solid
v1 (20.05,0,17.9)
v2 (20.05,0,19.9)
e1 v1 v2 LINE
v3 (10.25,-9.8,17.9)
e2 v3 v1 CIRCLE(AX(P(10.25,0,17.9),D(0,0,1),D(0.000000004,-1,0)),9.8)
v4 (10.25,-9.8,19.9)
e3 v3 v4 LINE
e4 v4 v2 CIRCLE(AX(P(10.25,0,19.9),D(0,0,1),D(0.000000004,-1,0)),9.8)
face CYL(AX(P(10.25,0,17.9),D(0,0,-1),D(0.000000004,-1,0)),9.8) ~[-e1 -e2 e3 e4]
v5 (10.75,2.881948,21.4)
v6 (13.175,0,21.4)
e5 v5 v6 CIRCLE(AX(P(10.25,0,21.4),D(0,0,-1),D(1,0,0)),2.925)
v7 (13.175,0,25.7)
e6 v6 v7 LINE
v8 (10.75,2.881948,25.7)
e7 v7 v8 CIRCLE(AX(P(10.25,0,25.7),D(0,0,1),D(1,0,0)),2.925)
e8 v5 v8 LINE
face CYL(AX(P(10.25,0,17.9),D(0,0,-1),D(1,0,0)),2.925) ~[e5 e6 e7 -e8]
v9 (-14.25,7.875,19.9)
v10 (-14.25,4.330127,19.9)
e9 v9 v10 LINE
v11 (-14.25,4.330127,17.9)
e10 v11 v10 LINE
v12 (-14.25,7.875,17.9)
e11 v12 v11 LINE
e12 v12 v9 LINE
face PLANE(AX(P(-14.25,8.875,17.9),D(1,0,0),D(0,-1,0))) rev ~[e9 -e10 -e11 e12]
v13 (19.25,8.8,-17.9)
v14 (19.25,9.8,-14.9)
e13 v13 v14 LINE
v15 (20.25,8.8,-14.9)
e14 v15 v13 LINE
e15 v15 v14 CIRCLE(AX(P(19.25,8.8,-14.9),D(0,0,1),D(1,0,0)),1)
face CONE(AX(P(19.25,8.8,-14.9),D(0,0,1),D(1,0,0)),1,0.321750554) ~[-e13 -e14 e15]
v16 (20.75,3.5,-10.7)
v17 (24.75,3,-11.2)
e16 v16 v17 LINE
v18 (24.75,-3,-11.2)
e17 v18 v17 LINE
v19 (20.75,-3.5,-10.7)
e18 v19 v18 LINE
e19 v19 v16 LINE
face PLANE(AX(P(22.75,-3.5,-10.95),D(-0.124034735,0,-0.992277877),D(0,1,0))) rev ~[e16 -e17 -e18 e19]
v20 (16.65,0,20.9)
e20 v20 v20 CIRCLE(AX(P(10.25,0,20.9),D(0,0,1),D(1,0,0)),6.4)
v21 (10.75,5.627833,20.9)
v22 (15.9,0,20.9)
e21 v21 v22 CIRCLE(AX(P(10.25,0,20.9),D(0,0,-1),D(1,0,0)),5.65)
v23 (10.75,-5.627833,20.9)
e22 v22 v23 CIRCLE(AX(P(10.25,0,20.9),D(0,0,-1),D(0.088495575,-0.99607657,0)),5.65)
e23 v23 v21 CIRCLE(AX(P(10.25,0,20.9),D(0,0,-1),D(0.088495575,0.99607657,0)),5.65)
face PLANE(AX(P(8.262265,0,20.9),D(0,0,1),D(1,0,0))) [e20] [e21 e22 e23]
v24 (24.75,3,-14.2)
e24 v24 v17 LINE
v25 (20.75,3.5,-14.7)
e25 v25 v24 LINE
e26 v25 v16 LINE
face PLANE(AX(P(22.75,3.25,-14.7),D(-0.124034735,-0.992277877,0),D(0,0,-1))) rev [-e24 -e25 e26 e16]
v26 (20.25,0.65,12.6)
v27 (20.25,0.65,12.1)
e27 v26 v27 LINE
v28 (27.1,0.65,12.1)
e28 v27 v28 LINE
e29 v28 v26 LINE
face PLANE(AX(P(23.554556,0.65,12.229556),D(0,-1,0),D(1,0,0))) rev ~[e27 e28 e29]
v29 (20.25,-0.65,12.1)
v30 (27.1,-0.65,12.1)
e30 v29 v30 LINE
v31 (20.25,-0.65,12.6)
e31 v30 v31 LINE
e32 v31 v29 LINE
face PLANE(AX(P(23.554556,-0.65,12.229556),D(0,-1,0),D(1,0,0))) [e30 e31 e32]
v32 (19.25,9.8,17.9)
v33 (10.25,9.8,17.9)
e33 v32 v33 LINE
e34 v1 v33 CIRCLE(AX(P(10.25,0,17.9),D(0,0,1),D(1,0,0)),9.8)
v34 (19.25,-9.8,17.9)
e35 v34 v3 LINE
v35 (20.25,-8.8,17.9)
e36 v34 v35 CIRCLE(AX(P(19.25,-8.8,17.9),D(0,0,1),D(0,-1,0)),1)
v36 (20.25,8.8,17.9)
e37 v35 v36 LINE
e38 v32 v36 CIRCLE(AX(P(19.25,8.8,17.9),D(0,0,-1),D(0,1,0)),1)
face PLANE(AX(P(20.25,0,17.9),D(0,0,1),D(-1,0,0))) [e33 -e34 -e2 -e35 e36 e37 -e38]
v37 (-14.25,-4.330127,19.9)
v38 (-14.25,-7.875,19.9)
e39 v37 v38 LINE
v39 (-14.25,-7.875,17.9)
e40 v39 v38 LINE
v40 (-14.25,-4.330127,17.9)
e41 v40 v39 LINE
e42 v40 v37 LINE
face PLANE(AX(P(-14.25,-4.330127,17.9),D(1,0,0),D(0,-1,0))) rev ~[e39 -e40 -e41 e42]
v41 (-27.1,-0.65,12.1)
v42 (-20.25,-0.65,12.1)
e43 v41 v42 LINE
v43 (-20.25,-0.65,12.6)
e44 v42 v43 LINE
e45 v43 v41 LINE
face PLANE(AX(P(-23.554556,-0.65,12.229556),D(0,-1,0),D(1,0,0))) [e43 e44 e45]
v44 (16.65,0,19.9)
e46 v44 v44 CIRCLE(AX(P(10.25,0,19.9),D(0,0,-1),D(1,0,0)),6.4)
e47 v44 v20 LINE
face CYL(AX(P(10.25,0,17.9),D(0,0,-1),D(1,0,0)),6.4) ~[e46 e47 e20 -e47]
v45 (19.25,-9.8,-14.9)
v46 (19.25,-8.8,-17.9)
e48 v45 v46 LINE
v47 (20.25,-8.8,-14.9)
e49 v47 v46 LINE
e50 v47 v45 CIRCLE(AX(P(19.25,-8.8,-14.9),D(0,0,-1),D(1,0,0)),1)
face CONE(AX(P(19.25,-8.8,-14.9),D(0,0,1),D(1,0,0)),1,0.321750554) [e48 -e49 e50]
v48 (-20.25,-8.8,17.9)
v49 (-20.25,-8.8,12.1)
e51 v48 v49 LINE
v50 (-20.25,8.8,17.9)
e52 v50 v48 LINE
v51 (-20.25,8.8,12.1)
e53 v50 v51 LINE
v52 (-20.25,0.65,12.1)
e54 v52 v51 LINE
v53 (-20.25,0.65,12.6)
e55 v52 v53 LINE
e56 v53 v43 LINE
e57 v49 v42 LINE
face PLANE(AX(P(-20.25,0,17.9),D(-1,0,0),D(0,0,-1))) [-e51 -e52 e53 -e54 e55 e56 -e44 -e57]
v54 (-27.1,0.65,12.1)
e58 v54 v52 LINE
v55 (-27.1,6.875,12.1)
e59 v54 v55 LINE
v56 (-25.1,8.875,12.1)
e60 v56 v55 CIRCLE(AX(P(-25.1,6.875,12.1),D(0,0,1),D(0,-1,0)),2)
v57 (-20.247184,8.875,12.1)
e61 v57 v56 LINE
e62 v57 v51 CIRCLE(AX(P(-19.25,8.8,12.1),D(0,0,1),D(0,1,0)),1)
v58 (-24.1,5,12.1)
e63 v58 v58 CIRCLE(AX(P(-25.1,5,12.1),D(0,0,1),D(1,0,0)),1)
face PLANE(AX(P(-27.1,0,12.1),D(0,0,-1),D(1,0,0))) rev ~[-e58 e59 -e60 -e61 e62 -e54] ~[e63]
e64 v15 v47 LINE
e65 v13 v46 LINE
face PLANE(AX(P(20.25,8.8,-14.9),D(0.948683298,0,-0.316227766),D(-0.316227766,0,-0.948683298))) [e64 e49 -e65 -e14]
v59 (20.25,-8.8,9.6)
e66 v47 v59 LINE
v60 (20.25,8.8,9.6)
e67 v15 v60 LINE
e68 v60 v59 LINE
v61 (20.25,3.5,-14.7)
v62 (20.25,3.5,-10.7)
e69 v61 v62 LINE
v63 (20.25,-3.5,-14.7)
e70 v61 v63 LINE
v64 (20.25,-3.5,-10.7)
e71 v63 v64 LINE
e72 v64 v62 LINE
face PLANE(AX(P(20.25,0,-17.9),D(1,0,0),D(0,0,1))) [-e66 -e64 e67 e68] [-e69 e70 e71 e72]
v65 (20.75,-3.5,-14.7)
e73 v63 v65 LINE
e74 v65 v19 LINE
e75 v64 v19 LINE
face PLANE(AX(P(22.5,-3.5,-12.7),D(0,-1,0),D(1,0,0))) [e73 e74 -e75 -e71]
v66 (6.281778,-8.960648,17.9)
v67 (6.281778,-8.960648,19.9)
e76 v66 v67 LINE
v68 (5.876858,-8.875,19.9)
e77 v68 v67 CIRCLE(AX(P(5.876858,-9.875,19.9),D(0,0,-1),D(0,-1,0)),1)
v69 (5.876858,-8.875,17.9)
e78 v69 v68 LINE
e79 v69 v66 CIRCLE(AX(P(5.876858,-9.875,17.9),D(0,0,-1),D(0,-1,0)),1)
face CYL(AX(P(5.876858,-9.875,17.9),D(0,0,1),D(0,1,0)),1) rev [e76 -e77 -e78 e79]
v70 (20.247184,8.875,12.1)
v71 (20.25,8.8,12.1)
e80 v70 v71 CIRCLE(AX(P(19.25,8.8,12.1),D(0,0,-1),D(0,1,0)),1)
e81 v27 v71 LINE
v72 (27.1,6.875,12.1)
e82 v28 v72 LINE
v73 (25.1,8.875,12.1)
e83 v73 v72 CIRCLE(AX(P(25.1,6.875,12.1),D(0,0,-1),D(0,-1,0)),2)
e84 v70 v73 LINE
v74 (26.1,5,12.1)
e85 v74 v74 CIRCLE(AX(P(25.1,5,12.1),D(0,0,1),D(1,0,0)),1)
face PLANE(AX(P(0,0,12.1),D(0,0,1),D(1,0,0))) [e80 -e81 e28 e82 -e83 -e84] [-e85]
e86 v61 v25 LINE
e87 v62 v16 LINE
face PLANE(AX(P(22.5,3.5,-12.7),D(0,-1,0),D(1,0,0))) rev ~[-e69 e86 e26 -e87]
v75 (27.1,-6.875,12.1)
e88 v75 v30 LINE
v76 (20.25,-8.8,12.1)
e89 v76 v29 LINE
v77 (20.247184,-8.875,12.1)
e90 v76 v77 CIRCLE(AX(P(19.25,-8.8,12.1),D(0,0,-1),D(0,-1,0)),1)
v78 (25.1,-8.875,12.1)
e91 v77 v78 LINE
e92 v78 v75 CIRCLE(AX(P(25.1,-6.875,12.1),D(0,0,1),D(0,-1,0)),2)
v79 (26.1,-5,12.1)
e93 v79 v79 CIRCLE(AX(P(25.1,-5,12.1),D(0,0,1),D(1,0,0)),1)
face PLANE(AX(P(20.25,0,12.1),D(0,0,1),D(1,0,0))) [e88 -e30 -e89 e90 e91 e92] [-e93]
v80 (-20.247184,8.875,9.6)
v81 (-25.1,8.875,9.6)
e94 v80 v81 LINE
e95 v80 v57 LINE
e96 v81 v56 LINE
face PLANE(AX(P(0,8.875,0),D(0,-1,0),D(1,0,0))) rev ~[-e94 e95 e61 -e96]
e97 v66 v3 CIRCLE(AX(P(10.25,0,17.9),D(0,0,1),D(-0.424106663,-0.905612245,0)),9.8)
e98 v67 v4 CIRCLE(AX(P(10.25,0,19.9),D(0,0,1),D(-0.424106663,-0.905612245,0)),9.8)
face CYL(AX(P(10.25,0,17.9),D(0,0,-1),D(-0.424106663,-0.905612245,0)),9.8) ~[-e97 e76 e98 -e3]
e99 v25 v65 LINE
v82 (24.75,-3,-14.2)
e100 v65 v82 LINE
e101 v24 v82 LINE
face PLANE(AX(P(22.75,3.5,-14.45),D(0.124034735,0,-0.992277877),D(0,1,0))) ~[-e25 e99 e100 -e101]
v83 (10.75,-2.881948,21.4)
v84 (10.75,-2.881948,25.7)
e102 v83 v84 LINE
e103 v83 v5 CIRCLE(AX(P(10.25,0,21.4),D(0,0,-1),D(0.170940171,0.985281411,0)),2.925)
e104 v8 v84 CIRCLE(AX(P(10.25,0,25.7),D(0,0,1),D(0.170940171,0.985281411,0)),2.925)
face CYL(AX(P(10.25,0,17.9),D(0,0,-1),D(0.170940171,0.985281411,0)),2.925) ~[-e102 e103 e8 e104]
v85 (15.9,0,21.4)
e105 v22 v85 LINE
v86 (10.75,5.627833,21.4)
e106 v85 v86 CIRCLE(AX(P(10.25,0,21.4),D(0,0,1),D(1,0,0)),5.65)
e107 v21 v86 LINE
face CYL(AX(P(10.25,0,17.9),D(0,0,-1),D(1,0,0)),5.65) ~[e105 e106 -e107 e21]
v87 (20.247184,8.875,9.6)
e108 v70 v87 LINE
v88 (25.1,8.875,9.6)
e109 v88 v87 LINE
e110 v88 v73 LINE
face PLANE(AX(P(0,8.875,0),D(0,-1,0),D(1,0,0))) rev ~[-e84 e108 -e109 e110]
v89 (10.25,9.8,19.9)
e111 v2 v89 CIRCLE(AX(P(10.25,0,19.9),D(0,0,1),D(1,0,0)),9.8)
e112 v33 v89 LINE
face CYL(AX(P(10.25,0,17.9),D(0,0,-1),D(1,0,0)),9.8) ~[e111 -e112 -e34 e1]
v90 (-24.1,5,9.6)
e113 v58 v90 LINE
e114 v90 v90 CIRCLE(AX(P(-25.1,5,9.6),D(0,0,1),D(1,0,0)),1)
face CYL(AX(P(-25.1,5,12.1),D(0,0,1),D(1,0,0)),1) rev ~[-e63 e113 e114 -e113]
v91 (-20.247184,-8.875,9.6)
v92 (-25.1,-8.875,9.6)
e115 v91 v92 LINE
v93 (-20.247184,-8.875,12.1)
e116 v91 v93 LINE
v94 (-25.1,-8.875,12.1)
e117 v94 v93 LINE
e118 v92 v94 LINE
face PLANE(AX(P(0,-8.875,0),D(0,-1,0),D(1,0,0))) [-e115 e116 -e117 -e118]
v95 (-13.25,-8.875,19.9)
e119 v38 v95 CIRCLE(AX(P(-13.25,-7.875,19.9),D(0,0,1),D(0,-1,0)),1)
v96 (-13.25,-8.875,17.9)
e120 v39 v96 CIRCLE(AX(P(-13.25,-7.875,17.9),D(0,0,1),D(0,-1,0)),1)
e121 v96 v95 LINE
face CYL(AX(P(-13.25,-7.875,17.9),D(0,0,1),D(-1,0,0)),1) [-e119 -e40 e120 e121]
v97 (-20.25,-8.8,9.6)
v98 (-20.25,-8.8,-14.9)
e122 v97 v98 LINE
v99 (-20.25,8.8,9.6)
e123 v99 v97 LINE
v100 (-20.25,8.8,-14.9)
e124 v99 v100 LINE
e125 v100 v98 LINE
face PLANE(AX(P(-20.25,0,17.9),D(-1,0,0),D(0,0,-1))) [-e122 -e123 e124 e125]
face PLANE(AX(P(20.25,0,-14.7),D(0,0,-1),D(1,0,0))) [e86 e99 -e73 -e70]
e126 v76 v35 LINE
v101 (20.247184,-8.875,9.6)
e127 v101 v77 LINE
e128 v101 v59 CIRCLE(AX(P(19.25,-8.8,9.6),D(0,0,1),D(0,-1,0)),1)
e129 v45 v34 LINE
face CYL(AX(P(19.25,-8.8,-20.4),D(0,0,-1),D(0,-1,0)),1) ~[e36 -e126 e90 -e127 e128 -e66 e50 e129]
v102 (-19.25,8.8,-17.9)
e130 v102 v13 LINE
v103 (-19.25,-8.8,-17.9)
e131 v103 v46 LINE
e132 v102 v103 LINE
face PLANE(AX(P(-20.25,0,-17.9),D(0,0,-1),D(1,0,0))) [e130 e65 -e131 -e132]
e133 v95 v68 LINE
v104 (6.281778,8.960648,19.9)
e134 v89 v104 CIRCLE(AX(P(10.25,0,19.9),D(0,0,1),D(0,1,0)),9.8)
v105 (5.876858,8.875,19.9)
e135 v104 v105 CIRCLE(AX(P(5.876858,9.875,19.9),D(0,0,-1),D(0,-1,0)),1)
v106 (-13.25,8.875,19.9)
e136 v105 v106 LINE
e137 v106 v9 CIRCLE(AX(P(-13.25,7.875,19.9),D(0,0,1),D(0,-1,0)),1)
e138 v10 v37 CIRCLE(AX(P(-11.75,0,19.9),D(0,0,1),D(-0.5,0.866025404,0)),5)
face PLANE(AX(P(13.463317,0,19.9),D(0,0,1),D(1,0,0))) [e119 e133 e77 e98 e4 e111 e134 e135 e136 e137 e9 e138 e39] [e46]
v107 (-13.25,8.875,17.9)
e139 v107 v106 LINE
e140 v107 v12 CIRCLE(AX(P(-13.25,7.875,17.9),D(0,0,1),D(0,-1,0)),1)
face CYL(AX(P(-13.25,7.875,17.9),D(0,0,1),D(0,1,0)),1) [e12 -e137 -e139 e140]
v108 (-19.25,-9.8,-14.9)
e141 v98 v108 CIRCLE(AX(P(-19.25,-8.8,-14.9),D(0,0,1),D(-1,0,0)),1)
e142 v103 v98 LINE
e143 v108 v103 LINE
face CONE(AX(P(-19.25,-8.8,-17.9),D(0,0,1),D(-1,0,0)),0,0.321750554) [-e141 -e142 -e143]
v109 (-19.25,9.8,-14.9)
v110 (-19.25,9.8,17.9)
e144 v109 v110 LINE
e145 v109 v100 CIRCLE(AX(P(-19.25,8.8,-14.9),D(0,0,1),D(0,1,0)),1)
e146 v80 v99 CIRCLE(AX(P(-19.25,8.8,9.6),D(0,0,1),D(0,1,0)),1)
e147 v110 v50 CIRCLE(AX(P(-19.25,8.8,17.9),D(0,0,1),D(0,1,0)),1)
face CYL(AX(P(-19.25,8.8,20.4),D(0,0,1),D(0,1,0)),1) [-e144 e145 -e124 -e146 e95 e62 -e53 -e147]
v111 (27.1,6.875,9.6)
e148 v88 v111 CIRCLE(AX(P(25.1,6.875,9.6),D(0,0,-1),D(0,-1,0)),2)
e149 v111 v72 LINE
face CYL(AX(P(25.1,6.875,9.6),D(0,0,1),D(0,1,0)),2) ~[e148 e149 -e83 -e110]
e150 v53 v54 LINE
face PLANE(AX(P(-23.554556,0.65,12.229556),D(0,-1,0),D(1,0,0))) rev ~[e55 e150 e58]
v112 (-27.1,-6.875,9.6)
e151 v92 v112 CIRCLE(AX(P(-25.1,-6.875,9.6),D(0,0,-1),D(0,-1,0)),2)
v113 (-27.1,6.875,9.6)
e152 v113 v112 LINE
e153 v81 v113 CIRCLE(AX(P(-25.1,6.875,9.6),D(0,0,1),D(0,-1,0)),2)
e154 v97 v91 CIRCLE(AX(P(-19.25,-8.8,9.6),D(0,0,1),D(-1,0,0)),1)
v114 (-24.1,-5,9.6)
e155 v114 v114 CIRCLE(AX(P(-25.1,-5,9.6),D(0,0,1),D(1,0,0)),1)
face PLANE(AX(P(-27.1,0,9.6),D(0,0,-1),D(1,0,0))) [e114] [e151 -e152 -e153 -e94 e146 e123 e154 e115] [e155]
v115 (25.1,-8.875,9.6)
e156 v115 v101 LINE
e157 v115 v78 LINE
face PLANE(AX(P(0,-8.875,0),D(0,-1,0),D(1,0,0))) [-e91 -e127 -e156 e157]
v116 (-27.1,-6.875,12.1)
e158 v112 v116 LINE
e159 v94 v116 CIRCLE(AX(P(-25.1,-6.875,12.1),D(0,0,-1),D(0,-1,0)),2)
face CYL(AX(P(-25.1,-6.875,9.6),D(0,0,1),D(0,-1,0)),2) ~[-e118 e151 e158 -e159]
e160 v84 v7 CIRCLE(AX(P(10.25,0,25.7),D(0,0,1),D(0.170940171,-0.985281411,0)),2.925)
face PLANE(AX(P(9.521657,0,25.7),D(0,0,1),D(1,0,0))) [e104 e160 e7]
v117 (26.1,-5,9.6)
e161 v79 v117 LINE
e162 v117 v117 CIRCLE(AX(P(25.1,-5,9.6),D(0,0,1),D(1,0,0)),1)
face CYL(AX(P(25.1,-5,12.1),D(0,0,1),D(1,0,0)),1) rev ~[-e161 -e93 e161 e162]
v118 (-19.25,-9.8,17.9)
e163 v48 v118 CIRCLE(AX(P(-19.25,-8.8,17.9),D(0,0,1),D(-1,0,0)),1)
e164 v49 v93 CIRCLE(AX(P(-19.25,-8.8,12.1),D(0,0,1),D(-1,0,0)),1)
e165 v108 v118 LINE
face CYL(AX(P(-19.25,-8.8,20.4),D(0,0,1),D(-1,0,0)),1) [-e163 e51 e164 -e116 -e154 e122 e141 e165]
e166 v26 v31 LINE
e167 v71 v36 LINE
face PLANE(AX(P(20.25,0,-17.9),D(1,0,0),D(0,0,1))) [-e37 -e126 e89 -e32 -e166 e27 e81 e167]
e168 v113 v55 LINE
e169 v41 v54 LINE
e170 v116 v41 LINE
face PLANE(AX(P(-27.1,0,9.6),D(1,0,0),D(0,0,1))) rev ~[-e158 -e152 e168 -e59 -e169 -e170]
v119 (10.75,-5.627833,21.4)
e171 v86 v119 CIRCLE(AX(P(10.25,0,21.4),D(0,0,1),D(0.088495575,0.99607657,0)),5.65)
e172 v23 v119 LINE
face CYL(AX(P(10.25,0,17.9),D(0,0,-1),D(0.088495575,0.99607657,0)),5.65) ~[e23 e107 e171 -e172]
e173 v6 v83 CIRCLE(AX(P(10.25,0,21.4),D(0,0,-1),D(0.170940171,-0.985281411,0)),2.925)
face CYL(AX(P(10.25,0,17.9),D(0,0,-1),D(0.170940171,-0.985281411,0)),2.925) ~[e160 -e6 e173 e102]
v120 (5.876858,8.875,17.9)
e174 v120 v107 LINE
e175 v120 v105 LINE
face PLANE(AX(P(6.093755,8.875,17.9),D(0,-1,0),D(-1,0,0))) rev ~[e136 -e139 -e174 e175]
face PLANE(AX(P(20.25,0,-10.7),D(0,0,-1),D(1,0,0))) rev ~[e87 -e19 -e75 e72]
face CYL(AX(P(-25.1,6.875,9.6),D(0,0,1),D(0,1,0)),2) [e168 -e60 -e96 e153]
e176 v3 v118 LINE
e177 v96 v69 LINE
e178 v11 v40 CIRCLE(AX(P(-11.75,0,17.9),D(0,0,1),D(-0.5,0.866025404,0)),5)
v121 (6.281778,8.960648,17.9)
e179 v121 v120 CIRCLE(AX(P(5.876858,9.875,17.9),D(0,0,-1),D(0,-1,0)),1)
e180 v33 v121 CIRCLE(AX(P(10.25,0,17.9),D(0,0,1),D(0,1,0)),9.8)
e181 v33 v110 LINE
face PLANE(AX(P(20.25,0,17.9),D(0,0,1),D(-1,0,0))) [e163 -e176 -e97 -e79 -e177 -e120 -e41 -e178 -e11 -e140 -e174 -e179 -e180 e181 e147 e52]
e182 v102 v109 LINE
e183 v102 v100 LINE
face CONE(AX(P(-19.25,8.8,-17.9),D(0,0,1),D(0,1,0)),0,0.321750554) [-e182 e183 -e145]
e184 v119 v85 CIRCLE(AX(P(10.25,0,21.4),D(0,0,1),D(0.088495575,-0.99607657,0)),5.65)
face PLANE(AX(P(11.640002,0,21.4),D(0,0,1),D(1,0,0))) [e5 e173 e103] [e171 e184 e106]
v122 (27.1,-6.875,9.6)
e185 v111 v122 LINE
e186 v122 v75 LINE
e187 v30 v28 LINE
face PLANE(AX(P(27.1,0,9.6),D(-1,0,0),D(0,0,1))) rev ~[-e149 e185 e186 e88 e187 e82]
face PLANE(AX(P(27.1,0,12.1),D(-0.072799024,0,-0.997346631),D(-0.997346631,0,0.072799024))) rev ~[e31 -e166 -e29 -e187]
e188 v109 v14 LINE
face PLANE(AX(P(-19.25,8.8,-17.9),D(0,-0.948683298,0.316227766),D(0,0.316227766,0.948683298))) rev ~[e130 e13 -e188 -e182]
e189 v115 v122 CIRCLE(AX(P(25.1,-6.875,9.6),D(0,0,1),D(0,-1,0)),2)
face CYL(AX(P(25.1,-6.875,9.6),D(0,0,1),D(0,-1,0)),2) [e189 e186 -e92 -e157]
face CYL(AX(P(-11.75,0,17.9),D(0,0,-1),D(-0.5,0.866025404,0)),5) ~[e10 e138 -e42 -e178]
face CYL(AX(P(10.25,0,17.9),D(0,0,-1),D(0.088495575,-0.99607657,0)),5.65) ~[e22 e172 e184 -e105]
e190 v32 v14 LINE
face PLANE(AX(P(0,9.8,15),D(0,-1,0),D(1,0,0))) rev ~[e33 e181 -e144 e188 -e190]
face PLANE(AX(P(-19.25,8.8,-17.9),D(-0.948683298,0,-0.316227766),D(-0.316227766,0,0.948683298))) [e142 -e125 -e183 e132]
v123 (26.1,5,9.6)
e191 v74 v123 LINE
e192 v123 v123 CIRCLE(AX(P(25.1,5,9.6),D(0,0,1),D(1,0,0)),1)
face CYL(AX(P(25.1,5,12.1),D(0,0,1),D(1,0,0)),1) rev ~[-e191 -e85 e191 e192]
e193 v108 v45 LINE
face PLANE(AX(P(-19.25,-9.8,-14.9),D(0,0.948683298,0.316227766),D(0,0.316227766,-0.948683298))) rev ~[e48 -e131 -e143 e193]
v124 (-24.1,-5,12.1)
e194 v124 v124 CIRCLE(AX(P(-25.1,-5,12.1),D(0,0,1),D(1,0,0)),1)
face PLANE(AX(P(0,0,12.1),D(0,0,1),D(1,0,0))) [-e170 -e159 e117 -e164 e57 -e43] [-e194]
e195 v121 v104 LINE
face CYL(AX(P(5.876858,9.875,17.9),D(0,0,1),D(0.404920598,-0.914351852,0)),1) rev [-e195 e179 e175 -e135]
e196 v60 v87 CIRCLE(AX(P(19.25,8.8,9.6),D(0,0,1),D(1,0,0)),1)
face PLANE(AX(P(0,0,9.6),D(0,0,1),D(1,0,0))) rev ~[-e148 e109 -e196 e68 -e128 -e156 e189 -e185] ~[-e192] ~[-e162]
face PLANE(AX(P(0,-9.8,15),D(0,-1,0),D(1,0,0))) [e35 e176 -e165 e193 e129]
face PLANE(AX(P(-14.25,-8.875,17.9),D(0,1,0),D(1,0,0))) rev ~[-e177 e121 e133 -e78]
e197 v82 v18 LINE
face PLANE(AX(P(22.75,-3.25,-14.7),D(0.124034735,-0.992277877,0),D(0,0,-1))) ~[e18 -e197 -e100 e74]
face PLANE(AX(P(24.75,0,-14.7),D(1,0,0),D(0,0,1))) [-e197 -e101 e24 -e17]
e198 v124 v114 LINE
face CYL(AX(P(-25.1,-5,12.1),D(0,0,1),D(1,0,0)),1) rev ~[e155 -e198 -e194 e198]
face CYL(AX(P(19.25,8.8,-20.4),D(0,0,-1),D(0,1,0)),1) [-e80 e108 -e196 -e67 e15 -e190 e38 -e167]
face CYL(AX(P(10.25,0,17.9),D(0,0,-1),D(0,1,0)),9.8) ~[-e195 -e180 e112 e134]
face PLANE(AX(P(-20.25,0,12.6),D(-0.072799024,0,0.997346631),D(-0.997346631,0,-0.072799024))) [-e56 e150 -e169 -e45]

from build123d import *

# Parameters (mm, degrees)
F0_W           = 40.5
F0_H           = 2.5
F1_DEPTH       = 9.8
F0_W_2         = 6.85
F2_DEPTH       = 8.875
F0_W_3         = 4.5
F0_H_2         = 4
F3_DEPTH       = 3.5
F4_SIZE2       = 0.5
F4_SIZE        = 4
F6_DEPTH       = 2
F7_DEPTH       = 3
F8_DEPTH       = 3.5
F9_DEPTH       = 7.8
F10_DEPTH      = 0.65
F11_R          = 1
F12_DEPTH      = 5
F13_R          = 2
F14_R          = 1
F15_T4_DEPTH   = 40.8
F15_T10_DEPTH  = 40.8
F15_T16_DEPTH  = 40.8
F15_T23_DEPTH  = 40.8
F15_T29_DEPTH  = 40.8
F15_T35_DEPTH  = 40.8
F15_T41_DEPTH  = 40.8
F15_T47_DEPTH  = 40.8
F15_T54_DEPTH  = 40.8
F15_T60_DEPTH  = 40.8
F15_T66_DEPTH  = 40.8
F15_T72_DEPTH  = 40.8
F15_T78_DEPTH  = 40.8
F15_T85_DEPTH  = 40.8
F15_T91_DEPTH  = 40.8
F15_T97_DEPTH  = 40.8
F15_T103_DEPTH = 40.8
F15_T109_DEPTH = 40.8
F15_T116_DEPTH = 40.8
F15_T122_DEPTH = 40.8
F16_T1_DEPTH   = 38.5
F16_T3_DEPTH   = 17.6
F16_T6_ANGLE   = 90.0000000053
F16_T8_ANGLE   = 90.0000000053
F16_T10_ANGLE  = 90.0000000053
F16_T12_ANGLE  = 90.0000000053


# Not quite as in the source:
# - a fillet or chamfer that OpenCascade refuses, or shapes differently, is made with other operations: its cross-section is extruded or revolved along the edge and cut away or added


with BuildPart() as f1:
    # F0 (on Front) → F1 (new body, symmetric)
    with BuildSketch(Plane.XZ):
        Polygon((20.25, 17.9), (-20.25, 17.9), (-20.25, 12.6), (-20.25, 12.1), (20.25, 12.1), (20.25, 12.6), align=None)
        Polygon((20.25, 9.6), (-20.25, 9.6), (-20.25, -17.9), (20.25, -17.9), (20.25, -14.7), (20.25, -10.7), align=None)
        with Locations((0, 10.85)):
            Rectangle(F0_W, F0_H)
    extrude(amount=F1_DEPTH, both=True)

    # F0 (on Front) → F2 (join, symmetric)
    with BuildSketch(Plane.XZ):
        with Locations((23.675, 10.85)):
            Rectangle(F0_W_2, F0_H)
        with Locations((-23.675, 10.85)):
            Rectangle(F0_W_2, F0_H)
    extrude(amount=F2_DEPTH, both=True)

    # F0 (on Front) → F3 (join, symmetric)
    with BuildSketch(Plane.XZ):
        with Locations((22.5, -12.7)):
            Rectangle(F0_W_3, F0_H_2)
    extrude(amount=F3_DEPTH, both=True)

    # F4
    f4_edges = [f1.edges().sort_by_distance(p)[0] for p in [
        (24.75, 0, -10.7),
        (24.75, 3.5, -12.7),
        (24.75, -3.5, -12.7),
        (24.75, 0, -14.7),
    ]]
    chamfer(f4_edges, length=F4_SIZE, length2=F4_SIZE2)

    # F5 (on face) → F6 (join)
    with BuildSketch(Plane.XY.offset(17.9)):
        with BuildLine():
            ThreePointArc((10.2500000427, -9.8), (17.1796464707, -6.9296464405), (20.05, 0))
            ThreePointArc((20.05, 0), (17.1796464556, 6.9296464556), (10.25, 9.8))
            ThreePointArc((10.25, 9.8), (8.1210331144, 9.5659552581), (6.0937546993, 8.875))
            Line((6.0937546993, 8.875), (10.75, 8.875))
            Line((10.75, 8.875), (10.75, 6.3804388564))
            ThreePointArc((10.75, 6.3804388564), (14.9489360498, 4.3451121965), (16.65, 0))
            ThreePointArc((16.65, 0), (14.9489360498, -4.3451121965), (10.75, -6.3804388564))
            Line((10.75, -6.3804388564), (10.75, -8.875))
            Line((10.75, -8.875), (6.0937546993, -8.875))
            ThreePointArc((6.0937546993, -8.875), (8.1210331353, -9.5659552627), (10.2500000427, -9.8))
        make_face()
        with BuildLine():
            ThreePointArc((16.65, 0), (14.9489360498, 4.3451121965), (10.75, 6.3804388564))
            Line((10.75, 6.3804388564), (10.75, 5.6278326201))
            ThreePointArc((10.75, 5.6278326201), (14.4181830574, 3.8142823702), (15.9, 0))
            ThreePointArc((15.9, 0), (14.4181830574, -3.8142823702), (10.75, -5.6278326201))
            Line((10.75, -5.6278326201), (10.75, -6.3804388564))
            ThreePointArc((10.75, -6.3804388564), (14.9489360498, -4.3451121965), (16.65, 0))
        make_face()
        with BuildLine():
            ThreePointArc((15.9, 0), (14.4181830574, 3.8142823702), (10.75, 5.6278326201))
            Line((10.75, 5.6278326201), (10.75, 2.8819481258))
            ThreePointArc((10.75, 2.8819481258), (12.4880934967, 1.8832319294), (13.175, 0))
            ThreePointArc((13.175, 0), (12.4880934967, -1.8832319294), (10.75, -2.8819481258))
            Line((10.75, -2.8819481258), (10.75, -5.6278326201))
            ThreePointArc((10.75, -5.6278326201), (14.4181830574, -3.8142823702), (15.9, 0))
        make_face()
        with BuildLine():
            Line((10.75, 2.8819481258), (10.75, 5.6278326201))
            ThreePointArc((10.75, 5.6278326201), (4.6, 0), (10.75, -5.6278326201))
            Line((10.75, -5.6278326201), (10.75, -2.8819481258))
            ThreePointArc((10.75, -2.8819481258), (7.325, 0), (10.75, 2.8819481258))
        make_face()
        with BuildLine():
            Line((10.75, -2.8819481258), (10.75, 2.8819481258))
            ThreePointArc((10.75, 2.8819481258), (7.325, 0), (10.75, -2.8819481258))
        make_face()
        with BuildLine():
            ThreePointArc((13.175, 0), (12.4880934967, 1.8832319294), (10.75, 2.8819481258))
            Line((10.75, 2.8819481258), (10.75, -2.8819481258))
            ThreePointArc((10.75, -2.8819481258), (12.4880934967, -1.8832319294), (13.175, 0))
        make_face()
        with BuildLine():
            Line((10.75, 5.6278326201), (10.75, 6.3804388564))
            ThreePointArc((10.75, 6.3804388564), (3.85, 0), (10.75, -6.3804388564))
            Line((10.75, -6.3804388564), (10.75, -5.6278326201))
            ThreePointArc((10.75, -5.6278326201), (4.6, 0), (10.75, 5.6278326201))
        make_face()
        with BuildLine():
            Line((10.75, 8.875), (6.0937546993, 8.875))
            ThreePointArc((6.0937546993, 8.875), (0.45, 0), (6.0937546993, -8.875))
            Line((6.0937546993, -8.875), (10.75, -8.875))
            Line((10.75, -8.875), (10.75, -6.3804388564))
            ThreePointArc((10.75, -6.3804388564), (3.85, 0), (10.75, 6.3804388564))
            Line((10.75, 6.3804388564), (10.75, 8.875))
        make_face()
        with BuildLine():
            ThreePointArc((6.0937546993, -8.875), (0.45, 0), (6.0937546993, 8.875))
            Line((6.0937546993, 8.875), (-14.25, 8.875))
            Line((-14.25, 8.875), (-14.25, 4.3301270189))
            ThreePointArc((-14.25, 4.3301270189), (-9.25, 4.3301270189), (-6.75, 0))
            ThreePointArc((-6.75, 0), (-9.25, -4.3301270189), (-14.25, -4.3301270189))
            Line((-14.25, -4.3301270189), (-14.25, -8.875))
            Line((-14.25, -8.875), (6.0937546993, -8.875))
        make_face()
        with BuildLine():
            ThreePointArc((-6.75, 0), (-9.25, 4.3301270189), (-14.25, 4.3301270189))
            Line((-14.25, 4.3301270189), (-14.25, -4.3301270189))
            ThreePointArc((-14.25, -4.3301270189), (-9.25, -4.3301270189), (-6.75, 0))
        make_face()
        with BuildLine():
            Line((-14.25, -4.3301270189), (-14.25, 4.3301270189))
            ThreePointArc((-14.25, 4.3301270189), (-16.75, 0), (-14.25, -4.3301270189))
        make_face()
    extrude(amount=F6_DEPTH)

    # F5 (on face) → F7 (join)
    with BuildSketch(Plane.XY.offset(17.9)):
        with BuildLine():
            Line((10.75, 2.8819481258), (10.75, 5.6278326201))
            ThreePointArc((10.75, 5.6278326201), (4.6, 0), (10.75, -5.6278326201))
            Line((10.75, -5.6278326201), (10.75, -2.8819481258))
            ThreePointArc((10.75, -2.8819481258), (7.325, 0), (10.75, 2.8819481258))
        make_face()
        with BuildLine():
            Line((10.75, -2.8819481258), (10.75, 2.8819481258))
            ThreePointArc((10.75, 2.8819481258), (7.325, 0), (10.75, -2.8819481258))
        make_face()
        with BuildLine():
            ThreePointArc((13.175, 0), (12.4880934967, 1.8832319294), (10.75, 2.8819481258))
            Line((10.75, 2.8819481258), (10.75, -2.8819481258))
            ThreePointArc((10.75, -2.8819481258), (12.4880934967, -1.8832319294), (13.175, 0))
        make_face()
        with BuildLine():
            ThreePointArc((15.9, 0), (14.4181830574, 3.8142823702), (10.75, 5.6278326201))
            Line((10.75, 5.6278326201), (10.75, 2.8819481258))
            ThreePointArc((10.75, 2.8819481258), (12.4880934967, 1.8832319294), (13.175, 0))
            ThreePointArc((13.175, 0), (12.4880934967, -1.8832319294), (10.75, -2.8819481258))
            Line((10.75, -2.8819481258), (10.75, -5.6278326201))
            ThreePointArc((10.75, -5.6278326201), (14.4181830574, -3.8142823702), (15.9, 0))
        make_face()
        with BuildLine():
            ThreePointArc((16.65, 0), (14.9489360498, 4.3451121965), (10.75, 6.3804388564))
            Line((10.75, 6.3804388564), (10.75, 5.6278326201))
            ThreePointArc((10.75, 5.6278326201), (14.4181830574, 3.8142823702), (15.9, 0))
            ThreePointArc((15.9, 0), (14.4181830574, -3.8142823702), (10.75, -5.6278326201))
            Line((10.75, -5.6278326201), (10.75, -6.3804388564))
            ThreePointArc((10.75, -6.3804388564), (14.9489360498, -4.3451121965), (16.65, 0))
        make_face()
        with BuildLine():
            Line((10.75, 5.6278326201), (10.75, 6.3804388564))
            ThreePointArc((10.75, 6.3804388564), (3.85, 0), (10.75, -6.3804388564))
            Line((10.75, -6.3804388564), (10.75, -5.6278326201))
            ThreePointArc((10.75, -5.6278326201), (4.6, 0), (10.75, 5.6278326201))
        make_face()
    extrude(amount=F7_DEPTH)

    # F5 (on face) → F8 (join)
    with BuildSketch(Plane.XY.offset(17.9)):
        with BuildLine():
            ThreePointArc((13.175, 0), (12.4880934967, 1.8832319294), (10.75, 2.8819481258))
            Line((10.75, 2.8819481258), (10.75, -2.8819481258))
            ThreePointArc((10.75, -2.8819481258), (12.4880934967, -1.8832319294), (13.175, 0))
        make_face()
        with BuildLine():
            Line((10.75, -2.8819481258), (10.75, 2.8819481258))
            ThreePointArc((10.75, 2.8819481258), (7.325, 0), (10.75, -2.8819481258))
        make_face()
        with BuildLine():
            Line((10.75, 2.8819481258), (10.75, 5.6278326201))
            ThreePointArc((10.75, 5.6278326201), (4.6, 0), (10.75, -5.6278326201))
            Line((10.75, -5.6278326201), (10.75, -2.8819481258))
            ThreePointArc((10.75, -2.8819481258), (7.325, 0), (10.75, 2.8819481258))
        make_face()
        with BuildLine():
            ThreePointArc((15.9, 0), (14.4181830574, 3.8142823702), (10.75, 5.6278326201))
            Line((10.75, 5.6278326201), (10.75, 2.8819481258))
            ThreePointArc((10.75, 2.8819481258), (12.4880934967, 1.8832319294), (13.175, 0))
            ThreePointArc((13.175, 0), (12.4880934967, -1.8832319294), (10.75, -2.8819481258))
            Line((10.75, -2.8819481258), (10.75, -5.6278326201))
            ThreePointArc((10.75, -5.6278326201), (14.4181830574, -3.8142823702), (15.9, 0))
        make_face()
    extrude(amount=F8_DEPTH)

    # F5 (on face) → F9 (join)
    with BuildSketch(Plane.XY.offset(17.9)):
        with BuildLine():
            Line((10.75, -2.8819481258), (10.75, 2.8819481258))
            ThreePointArc((10.75, 2.8819481258), (7.325, 0), (10.75, -2.8819481258))
        make_face()
        with BuildLine():
            ThreePointArc((13.175, 0), (12.4880934967, 1.8832319294), (10.75, 2.8819481258))
            Line((10.75, 2.8819481258), (10.75, -2.8819481258))
            ThreePointArc((10.75, -2.8819481258), (12.4880934967, -1.8832319294), (13.175, 0))
        make_face()
    extrude(amount=F9_DEPTH)

    # F0 (on Front) → F10 (join, symmetric)
    with BuildSketch(Plane.XZ):
        Polygon((27.1, 12.1), (20.25, 12.6), (20.25, 12.1), align=None)
        Polygon((-20.25, 12.1), (-20.25, 12.6), (-27.1, 12.1), align=None)
    extrude(amount=F10_DEPTH, both=True)

    # F11 (on face) → F12 (cut)
    with BuildSketch(Plane.XY.offset(12.1)):
        with Locations((-25.1, 5)):
            Circle(F11_R)
        with Locations((-25.1, -5)):
            Circle(F11_R)
        with Locations((25.1, 5)):
            Circle(F11_R)
        with Locations((25.1, -5)):
            Circle(F11_R)
    extrude(amount=-F12_DEPTH, mode=Mode.SUBTRACT)

    # F13
    f13_edges = [f1.edges().sort_by_distance(p)[0] for p in [
        (27.1, -8.875, 10.85),
        (27.1, 8.875, 10.85),
        (-27.1, -8.875, 10.85),
        (-27.1, 8.875, 10.85),
    ]]
    fillet(f13_edges, radius=F13_R)

    # F14
    f14_edges = [f1.edges().sort_by_distance(p)[0] for p in [
        (-14.25, -8.875, 18.9),
        (-14.25, 8.875, 18.9),
        (6.093755, 8.875, 18.9),
        (6.093755, -8.875, 18.9),
    ]]
    fillet(f14_edges, radius=F14_R)

    # F15: fillet of radius 1 on 4 edges, made by hand


with BuildPart() as f15_tool2:
    # F15_s3 → F15_t4 (new body)
    with BuildSketch(Plane.XY.offset(-20.4)):
        with BuildLine():
            ThreePointArc((19.25, -9.8), (19.9571067812, -9.5071067812), (20.25, -8.8))
            Line((20.25, -8.8), (20.25, -9.8))
            Line((20.25, -9.8), (19.25, -9.8))
        make_face()
    extrude(amount=F15_T4_DEPTH)

    split(bisect_by=Plane.XZ.offset(8.875), keep=Keep.TOP)

    split(bisect_by=Plane.XY.offset(9.6), keep=Keep.BOTTOM)


with BuildPart() as f1_1:
    add(f1.part)

    # F15_t1: cut F15_tool2
    add(f15_tool2.part, mode=Mode.SUBTRACT)


with BuildPart() as f15_tool8:
    # F15_s9 → F15_t10 (new body)
    with BuildSketch(Plane.XY.offset(-20.4)):
        with BuildLine():
            ThreePointArc((19.25, -9.8), (19.9571067812, -9.5071067812), (20.25, -8.8))
            Line((20.25, -8.8), (20.25, -9.8))
            Line((20.25, -9.8), (19.25, -9.8))
        make_face()
    extrude(amount=F15_T10_DEPTH)

    split(bisect_by=Plane.XZ.offset(8.875), keep=Keep.BOTTOM)

    split(bisect_by=Plane.XY.offset(9.6), keep=Keep.BOTTOM)


with BuildPart() as f1_2:
    add(f1_1.part)

    # F15_t7: cut F15_tool8
    add(f15_tool8.part, mode=Mode.SUBTRACT)


with BuildPart() as f15_tool14:
    # F15_s15 → F15_t16 (new body)
    with BuildSketch(Plane.XY.offset(-20.4)):
        with BuildLine():
            ThreePointArc((19.25, -9.8), (19.9571067812, -9.5071067812), (20.25, -8.8))
            Line((20.25, -8.8), (20.25, -9.8))
            Line((20.25, -9.8), (19.25, -9.8))
        make_face()
    extrude(amount=F15_T16_DEPTH)

    split(bisect_by=Plane.XY.offset(12.1), keep=Keep.BOTTOM)

    split(bisect_by=Plane.XZ.offset(8.875), keep=Keep.TOP)

    split(bisect_by=Plane.XY.offset(9.6), keep=Keep.TOP)


with BuildPart() as f1_3:
    add(f1_2.part)

    # F15_t13: cut F15_tool14
    add(f15_tool14.part, mode=Mode.SUBTRACT)


with BuildPart() as f15_tool21:
    # F15_s22 → F15_t23 (new body)
    with BuildSketch(Plane.XY.offset(-20.4)):
        with BuildLine():
            ThreePointArc((19.25, -9.8), (19.9571067812, -9.5071067812), (20.25, -8.8))
            Line((20.25, -8.8), (20.25, -9.8))
            Line((20.25, -9.8), (19.25, -9.8))
        make_face()
    extrude(amount=F15_T23_DEPTH)

    split(bisect_by=Plane.XY.offset(12.1), keep=Keep.TOP)

    split(bisect_by=Plane.XZ.offset(8.875), keep=Keep.TOP)


with BuildPart() as f1_4:
    add(f1_3.part)

    # F15_t20: cut F15_tool21
    add(f15_tool21.part, mode=Mode.SUBTRACT)


with BuildPart() as f15_tool27:
    # F15_s28 → F15_t29 (new body)
    with BuildSketch(Plane.XY.offset(-20.4)):
        with BuildLine():
            ThreePointArc((19.25, -9.8), (19.9571067812, -9.5071067812), (20.25, -8.8))
            Line((20.25, -8.8), (20.25, -9.8))
            Line((20.25, -9.8), (19.25, -9.8))
        make_face()
    extrude(amount=F15_T29_DEPTH)

    split(bisect_by=Plane.XY.offset(12.1), keep=Keep.TOP)

    split(bisect_by=Plane.XZ.offset(8.875), keep=Keep.BOTTOM)


with BuildPart() as f1_5:
    add(f1_4.part)

    # F15_t26: cut F15_tool27
    add(f15_tool27.part, mode=Mode.SUBTRACT)


with BuildPart() as f15_tool33:
    # F15_s34 → F15_t35 (new body)
    with BuildSketch(Plane.XY.offset(20.4)):
        with BuildLine():
            ThreePointArc((-20.25, -8.8), (-19.9571067812, -9.5071067812), (-19.25, -9.8))
            Line((-19.25, -9.8), (-20.25, -9.8))
            Line((-20.25, -9.8), (-20.25, -8.8))
        make_face()
    extrude(amount=-F15_T35_DEPTH)

    split(bisect_by=Plane.XZ.offset(8.875), keep=Keep.BOTTOM)

    split(bisect_by=Plane.XY.offset(12.1), keep=Keep.TOP)


with BuildPart() as f1_6:
    add(f1_5.part)

    # F15_t32: cut F15_tool33
    add(f15_tool33.part, mode=Mode.SUBTRACT)


with BuildPart() as f15_tool39:
    # F15_s40 → F15_t41 (new body)
    with BuildSketch(Plane.XY.offset(20.4)):
        with BuildLine():
            ThreePointArc((-20.25, -8.8), (-19.9571067812, -9.5071067812), (-19.25, -9.8))
            Line((-19.25, -9.8), (-20.25, -9.8))
            Line((-20.25, -9.8), (-20.25, -8.8))
        make_face()
    extrude(amount=-F15_T41_DEPTH)

    split(bisect_by=Plane.XZ.offset(8.875), keep=Keep.TOP)

    split(bisect_by=Plane.XY.offset(12.1), keep=Keep.TOP)


with BuildPart() as f1_7:
    add(f1_6.part)

    # F15_t38: cut F15_tool39
    add(f15_tool39.part, mode=Mode.SUBTRACT)


with BuildPart() as f15_tool45:
    # F15_s46 → F15_t47 (new body)
    with BuildSketch(Plane.XY.offset(20.4)):
        with BuildLine():
            ThreePointArc((-20.25, -8.8), (-19.9571067812, -9.5071067812), (-19.25, -9.8))
            Line((-19.25, -9.8), (-20.25, -9.8))
            Line((-20.25, -9.8), (-20.25, -8.8))
        make_face()
    extrude(amount=-F15_T47_DEPTH)

    split(bisect_by=Plane.XZ.offset(8.875), keep=Keep.TOP)

    split(bisect_by=Plane.XY.offset(12.1), keep=Keep.BOTTOM)

    split(bisect_by=Plane.XY.offset(9.6), keep=Keep.TOP)


with BuildPart() as f1_8:
    add(f1_7.part)

    # F15_t44: cut F15_tool45
    add(f15_tool45.part, mode=Mode.SUBTRACT)


with BuildPart() as f15_tool52:
    # F15_s53 → F15_t54 (new body)
    with BuildSketch(Plane.XY.offset(20.4)):
        with BuildLine():
            ThreePointArc((-20.25, -8.8), (-19.9571067812, -9.5071067812), (-19.25, -9.8))
            Line((-19.25, -9.8), (-20.25, -9.8))
            Line((-20.25, -9.8), (-20.25, -8.8))
        make_face()
    extrude(amount=-F15_T54_DEPTH)

    split(bisect_by=Plane.XZ.offset(8.875), keep=Keep.BOTTOM)

    split(bisect_by=Plane.XY.offset(9.6), keep=Keep.BOTTOM)


with BuildPart() as f1_9:
    add(f1_8.part)

    # F15_t51: cut F15_tool52
    add(f15_tool52.part, mode=Mode.SUBTRACT)


with BuildPart() as f15_tool58:
    # F15_s59 → F15_t60 (new body)
    with BuildSketch(Plane.XY.offset(20.4)):
        with BuildLine():
            ThreePointArc((-20.25, -8.8), (-19.9571067812, -9.5071067812), (-19.25, -9.8))
            Line((-19.25, -9.8), (-20.25, -9.8))
            Line((-20.25, -9.8), (-20.25, -8.8))
        make_face()
    extrude(amount=-F15_T60_DEPTH)

    split(bisect_by=Plane.XZ.offset(8.875), keep=Keep.TOP)

    split(bisect_by=Plane.XY.offset(9.6), keep=Keep.BOTTOM)


with BuildPart() as f1_10:
    add(f1_9.part)

    # F15_t57: cut F15_tool58
    add(f15_tool58.part, mode=Mode.SUBTRACT)


with BuildPart() as f15_tool64:
    # F15_s65 → F15_t66 (new body)
    with BuildSketch(Plane.XY.offset(20.4)):
        with BuildLine():
            ThreePointArc((-19.25, 9.8), (-19.9571067812, 9.5071067812), (-20.25, 8.8))
            Line((-20.25, 8.8), (-20.25, 9.8))
            Line((-20.25, 9.8), (-19.25, 9.8))
        make_face()
    extrude(amount=-F15_T66_DEPTH)

    split(bisect_by=Plane.XY.offset(12.1), keep=Keep.TOP)

    split(bisect_by=Plane.XZ.offset(-8.875), keep=Keep.BOTTOM)


with BuildPart() as f1_11:
    add(f1_10.part)

    # F15_t63: cut F15_tool64
    add(f15_tool64.part, mode=Mode.SUBTRACT)


with BuildPart() as f15_tool70:
    # F15_s71 → F15_t72 (new body)
    with BuildSketch(Plane.XY.offset(20.4)):
        with BuildLine():
            ThreePointArc((-19.25, 9.8), (-19.9571067812, 9.5071067812), (-20.25, 8.8))
            Line((-20.25, 8.8), (-20.25, 9.8))
            Line((-20.25, 9.8), (-19.25, 9.8))
        make_face()
    extrude(amount=-F15_T72_DEPTH)

    split(bisect_by=Plane.XY.offset(12.1), keep=Keep.TOP)

    split(bisect_by=Plane.XZ.offset(-8.875), keep=Keep.TOP)


with BuildPart() as f1_12:
    add(f1_11.part)

    # F15_t69: cut F15_tool70
    add(f15_tool70.part, mode=Mode.SUBTRACT)


with BuildPart() as f15_tool76:
    # F15_s77 → F15_t78 (new body)
    with BuildSketch(Plane.XY.offset(20.4)):
        with BuildLine():
            ThreePointArc((-19.25, 9.8), (-19.9571067812, 9.5071067812), (-20.25, 8.8))
            Line((-20.25, 8.8), (-20.25, 9.8))
            Line((-20.25, 9.8), (-19.25, 9.8))
        make_face()
    extrude(amount=-F15_T78_DEPTH)

    split(bisect_by=Plane.XY.offset(12.1), keep=Keep.BOTTOM)

    split(bisect_by=Plane.XZ.offset(-8.875), keep=Keep.BOTTOM)

    split(bisect_by=Plane.XY.offset(9.6), keep=Keep.TOP)


with BuildPart() as f1_13:
    add(f1_12.part)

    # F15_t75: cut F15_tool76
    add(f15_tool76.part, mode=Mode.SUBTRACT)


with BuildPart() as f15_tool83:
    # F15_s84 → F15_t85 (new body)
    with BuildSketch(Plane.XY.offset(20.4)):
        with BuildLine():
            ThreePointArc((-19.25, 9.8), (-19.9571067812, 9.5071067812), (-20.25, 8.8))
            Line((-20.25, 8.8), (-20.25, 9.8))
            Line((-20.25, 9.8), (-19.25, 9.8))
        make_face()
    extrude(amount=-F15_T85_DEPTH)

    split(bisect_by=Plane.XZ.offset(-8.875), keep=Keep.BOTTOM)

    split(bisect_by=Plane.XY.offset(9.6), keep=Keep.BOTTOM)


with BuildPart() as f1_14:
    add(f1_13.part)

    # F15_t82: cut F15_tool83
    add(f15_tool83.part, mode=Mode.SUBTRACT)


with BuildPart() as f15_tool89:
    # F15_s90 → F15_t91 (new body)
    with BuildSketch(Plane.XY.offset(20.4)):
        with BuildLine():
            ThreePointArc((-19.25, 9.8), (-19.9571067812, 9.5071067812), (-20.25, 8.8))
            Line((-20.25, 8.8), (-20.25, 9.8))
            Line((-20.25, 9.8), (-19.25, 9.8))
        make_face()
    extrude(amount=-F15_T91_DEPTH)

    split(bisect_by=Plane.XZ.offset(-8.875), keep=Keep.TOP)

    split(bisect_by=Plane.XY.offset(9.6), keep=Keep.BOTTOM)


with BuildPart() as f1_15:
    add(f1_14.part)

    # F15_t88: cut F15_tool89
    add(f15_tool89.part, mode=Mode.SUBTRACT)


with BuildPart() as f15_tool95:
    # F15_s96 → F15_t97 (new body)
    with BuildSketch(Plane.XY.offset(-20.4)):
        with BuildLine():
            ThreePointArc((19.25, 9.8), (19.9571067812, 9.5071067812), (20.25, 8.8))
            Line((20.25, 8.8), (20.25, 9.8))
            Line((20.25, 9.8), (19.25, 9.8))
        make_face()
    extrude(amount=F15_T97_DEPTH)

    split(bisect_by=Plane.XY.offset(9.6), keep=Keep.BOTTOM)

    split(bisect_by=Plane.XZ.offset(-8.875), keep=Keep.BOTTOM)


with BuildPart() as f1_16:
    add(f1_15.part)

    # F15_t94: cut F15_tool95
    add(f15_tool95.part, mode=Mode.SUBTRACT)


with BuildPart() as f15_tool101:
    # F15_s102 → F15_t103 (new body)
    with BuildSketch(Plane.XY.offset(-20.4)):
        with BuildLine():
            ThreePointArc((19.25, 9.8), (19.9571067812, 9.5071067812), (20.25, 8.8))
            Line((20.25, 8.8), (20.25, 9.8))
            Line((20.25, 9.8), (19.25, 9.8))
        make_face()
    extrude(amount=F15_T103_DEPTH)

    split(bisect_by=Plane.XY.offset(9.6), keep=Keep.BOTTOM)

    split(bisect_by=Plane.XZ.offset(-8.875), keep=Keep.TOP)


with BuildPart() as f1_17:
    add(f1_16.part)

    # F15_t100: cut F15_tool101
    add(f15_tool101.part, mode=Mode.SUBTRACT)


with BuildPart() as f15_tool107:
    # F15_s108 → F15_t109 (new body)
    with BuildSketch(Plane.XY.offset(-20.4)):
        with BuildLine():
            ThreePointArc((19.25, 9.8), (19.9571067812, 9.5071067812), (20.25, 8.8))
            Line((20.25, 8.8), (20.25, 9.8))
            Line((20.25, 9.8), (19.25, 9.8))
        make_face()
    extrude(amount=F15_T109_DEPTH)

    split(bisect_by=Plane.XY.offset(12.1), keep=Keep.BOTTOM)

    split(bisect_by=Plane.XY.offset(9.6), keep=Keep.TOP)

    split(bisect_by=Plane.XZ.offset(-8.875), keep=Keep.BOTTOM)


with BuildPart() as f1_18:
    add(f1_17.part)

    # F15_t106: cut F15_tool107
    add(f15_tool107.part, mode=Mode.SUBTRACT)


with BuildPart() as f15_tool114:
    # F15_s115 → F15_t116 (new body)
    with BuildSketch(Plane.XY.offset(-20.4)):
        with BuildLine():
            ThreePointArc((19.25, 9.8), (19.9571067812, 9.5071067812), (20.25, 8.8))
            Line((20.25, 8.8), (20.25, 9.8))
            Line((20.25, 9.8), (19.25, 9.8))
        make_face()
    extrude(amount=F15_T116_DEPTH)

    split(bisect_by=Plane.XY.offset(12.1), keep=Keep.TOP)

    split(bisect_by=Plane.XZ.offset(-8.875), keep=Keep.BOTTOM)


with BuildPart() as f1_19:
    add(f1_18.part)

    # F15_t113: cut F15_tool114
    add(f15_tool114.part, mode=Mode.SUBTRACT)


with BuildPart() as f15_tool120:
    # F15_s121 → F15_t122 (new body)
    with BuildSketch(Plane.XY.offset(-20.4)):
        with BuildLine():
            ThreePointArc((19.25, 9.8), (19.9571067812, 9.5071067812), (20.25, 8.8))
            Line((20.25, 8.8), (20.25, 9.8))
            Line((20.25, 9.8), (19.25, 9.8))
        make_face()
    extrude(amount=F15_T122_DEPTH)

    split(bisect_by=Plane.XY.offset(12.1), keep=Keep.TOP)

    split(bisect_by=Plane.XZ.offset(-8.875), keep=Keep.TOP)


with BuildPart() as f1_20:
    add(f1_19.part)

    # F15_t119: cut F15_tool120
    add(f15_tool120.part, mode=Mode.SUBTRACT)

    # F16: chamfer of 3 x 1 on 8 edges, made by hand

    # F16_s2 → F16_t1 (cut)
    with BuildSketch(Plane.YZ.offset(-19.25)):
        Polygon((-9.8, -14.9), (-8.8, -17.9), (-9.8, -17.9), align=None)
        Polygon((8.8, -17.9), (9.8, -14.9), (9.8, -17.9), align=None)
    extrude(amount=F16_T1_DEPTH, mode=Mode.SUBTRACT)

    # F16_s4 → F16_t3 (cut)
    with BuildSketch(Plane.XZ.offset(-8.8)):
        Polygon((20.25, -14.9), (19.25, -17.9), (20.25, -17.9), align=None)
        Polygon((-19.25, -17.9), (-20.25, -14.9), (-20.25, -17.9), align=None)
    extrude(amount=F16_T3_DEPTH, mode=Mode.SUBTRACT)

    # F16_s5 → F16_t6 (revolve, cut)
    with BuildSketch(Plane.XZ.offset(-8.8)):
        Polygon((20.25, -14.9), (19.25, -17.9), (20.25, -17.9), align=None)
    revolve(axis=Axis((19.25, 8.8, -17.9), (0, 0, 1)), revolution_arc=F16_T6_ANGLE, mode=Mode.SUBTRACT)

    # F16_s7 → F16_t8 (revolve, cut)
    with BuildSketch(Plane.XZ.offset(8.8)):
        Polygon((20.25, -14.9), (19.25, -17.9), (20.25, -17.9), align=None)
    revolve(axis=Axis((19.25, -8.8, -17.9), (0, 0, -1)), revolution_arc=F16_T8_ANGLE, mode=Mode.SUBTRACT)

    # F16_s9 → F16_t10 (revolve, cut)
    with BuildSketch(Plane.YZ.offset(-19.25)):
        Polygon((8.8, -17.9), (9.8, -14.9), (9.8, -17.9), align=None)
    revolve(axis=Axis((-19.25, 8.8, -17.9), (0, 0, 1)), revolution_arc=F16_T10_ANGLE, mode=Mode.SUBTRACT)

    # F16_s11 → F16_t12 (revolve, cut)
    with BuildSketch(Plane.XZ.offset(8.8)):
        Polygon((-19.25, -17.9), (-20.25, -14.9), (-20.25, -17.9), align=None)
    revolve(axis=Axis((-19.25, -8.8, -17.9), (0, 0, 1)), revolution_arc=F16_T12_ANGLE, mode=Mode.SUBTRACT)


solid = f1_20.part
